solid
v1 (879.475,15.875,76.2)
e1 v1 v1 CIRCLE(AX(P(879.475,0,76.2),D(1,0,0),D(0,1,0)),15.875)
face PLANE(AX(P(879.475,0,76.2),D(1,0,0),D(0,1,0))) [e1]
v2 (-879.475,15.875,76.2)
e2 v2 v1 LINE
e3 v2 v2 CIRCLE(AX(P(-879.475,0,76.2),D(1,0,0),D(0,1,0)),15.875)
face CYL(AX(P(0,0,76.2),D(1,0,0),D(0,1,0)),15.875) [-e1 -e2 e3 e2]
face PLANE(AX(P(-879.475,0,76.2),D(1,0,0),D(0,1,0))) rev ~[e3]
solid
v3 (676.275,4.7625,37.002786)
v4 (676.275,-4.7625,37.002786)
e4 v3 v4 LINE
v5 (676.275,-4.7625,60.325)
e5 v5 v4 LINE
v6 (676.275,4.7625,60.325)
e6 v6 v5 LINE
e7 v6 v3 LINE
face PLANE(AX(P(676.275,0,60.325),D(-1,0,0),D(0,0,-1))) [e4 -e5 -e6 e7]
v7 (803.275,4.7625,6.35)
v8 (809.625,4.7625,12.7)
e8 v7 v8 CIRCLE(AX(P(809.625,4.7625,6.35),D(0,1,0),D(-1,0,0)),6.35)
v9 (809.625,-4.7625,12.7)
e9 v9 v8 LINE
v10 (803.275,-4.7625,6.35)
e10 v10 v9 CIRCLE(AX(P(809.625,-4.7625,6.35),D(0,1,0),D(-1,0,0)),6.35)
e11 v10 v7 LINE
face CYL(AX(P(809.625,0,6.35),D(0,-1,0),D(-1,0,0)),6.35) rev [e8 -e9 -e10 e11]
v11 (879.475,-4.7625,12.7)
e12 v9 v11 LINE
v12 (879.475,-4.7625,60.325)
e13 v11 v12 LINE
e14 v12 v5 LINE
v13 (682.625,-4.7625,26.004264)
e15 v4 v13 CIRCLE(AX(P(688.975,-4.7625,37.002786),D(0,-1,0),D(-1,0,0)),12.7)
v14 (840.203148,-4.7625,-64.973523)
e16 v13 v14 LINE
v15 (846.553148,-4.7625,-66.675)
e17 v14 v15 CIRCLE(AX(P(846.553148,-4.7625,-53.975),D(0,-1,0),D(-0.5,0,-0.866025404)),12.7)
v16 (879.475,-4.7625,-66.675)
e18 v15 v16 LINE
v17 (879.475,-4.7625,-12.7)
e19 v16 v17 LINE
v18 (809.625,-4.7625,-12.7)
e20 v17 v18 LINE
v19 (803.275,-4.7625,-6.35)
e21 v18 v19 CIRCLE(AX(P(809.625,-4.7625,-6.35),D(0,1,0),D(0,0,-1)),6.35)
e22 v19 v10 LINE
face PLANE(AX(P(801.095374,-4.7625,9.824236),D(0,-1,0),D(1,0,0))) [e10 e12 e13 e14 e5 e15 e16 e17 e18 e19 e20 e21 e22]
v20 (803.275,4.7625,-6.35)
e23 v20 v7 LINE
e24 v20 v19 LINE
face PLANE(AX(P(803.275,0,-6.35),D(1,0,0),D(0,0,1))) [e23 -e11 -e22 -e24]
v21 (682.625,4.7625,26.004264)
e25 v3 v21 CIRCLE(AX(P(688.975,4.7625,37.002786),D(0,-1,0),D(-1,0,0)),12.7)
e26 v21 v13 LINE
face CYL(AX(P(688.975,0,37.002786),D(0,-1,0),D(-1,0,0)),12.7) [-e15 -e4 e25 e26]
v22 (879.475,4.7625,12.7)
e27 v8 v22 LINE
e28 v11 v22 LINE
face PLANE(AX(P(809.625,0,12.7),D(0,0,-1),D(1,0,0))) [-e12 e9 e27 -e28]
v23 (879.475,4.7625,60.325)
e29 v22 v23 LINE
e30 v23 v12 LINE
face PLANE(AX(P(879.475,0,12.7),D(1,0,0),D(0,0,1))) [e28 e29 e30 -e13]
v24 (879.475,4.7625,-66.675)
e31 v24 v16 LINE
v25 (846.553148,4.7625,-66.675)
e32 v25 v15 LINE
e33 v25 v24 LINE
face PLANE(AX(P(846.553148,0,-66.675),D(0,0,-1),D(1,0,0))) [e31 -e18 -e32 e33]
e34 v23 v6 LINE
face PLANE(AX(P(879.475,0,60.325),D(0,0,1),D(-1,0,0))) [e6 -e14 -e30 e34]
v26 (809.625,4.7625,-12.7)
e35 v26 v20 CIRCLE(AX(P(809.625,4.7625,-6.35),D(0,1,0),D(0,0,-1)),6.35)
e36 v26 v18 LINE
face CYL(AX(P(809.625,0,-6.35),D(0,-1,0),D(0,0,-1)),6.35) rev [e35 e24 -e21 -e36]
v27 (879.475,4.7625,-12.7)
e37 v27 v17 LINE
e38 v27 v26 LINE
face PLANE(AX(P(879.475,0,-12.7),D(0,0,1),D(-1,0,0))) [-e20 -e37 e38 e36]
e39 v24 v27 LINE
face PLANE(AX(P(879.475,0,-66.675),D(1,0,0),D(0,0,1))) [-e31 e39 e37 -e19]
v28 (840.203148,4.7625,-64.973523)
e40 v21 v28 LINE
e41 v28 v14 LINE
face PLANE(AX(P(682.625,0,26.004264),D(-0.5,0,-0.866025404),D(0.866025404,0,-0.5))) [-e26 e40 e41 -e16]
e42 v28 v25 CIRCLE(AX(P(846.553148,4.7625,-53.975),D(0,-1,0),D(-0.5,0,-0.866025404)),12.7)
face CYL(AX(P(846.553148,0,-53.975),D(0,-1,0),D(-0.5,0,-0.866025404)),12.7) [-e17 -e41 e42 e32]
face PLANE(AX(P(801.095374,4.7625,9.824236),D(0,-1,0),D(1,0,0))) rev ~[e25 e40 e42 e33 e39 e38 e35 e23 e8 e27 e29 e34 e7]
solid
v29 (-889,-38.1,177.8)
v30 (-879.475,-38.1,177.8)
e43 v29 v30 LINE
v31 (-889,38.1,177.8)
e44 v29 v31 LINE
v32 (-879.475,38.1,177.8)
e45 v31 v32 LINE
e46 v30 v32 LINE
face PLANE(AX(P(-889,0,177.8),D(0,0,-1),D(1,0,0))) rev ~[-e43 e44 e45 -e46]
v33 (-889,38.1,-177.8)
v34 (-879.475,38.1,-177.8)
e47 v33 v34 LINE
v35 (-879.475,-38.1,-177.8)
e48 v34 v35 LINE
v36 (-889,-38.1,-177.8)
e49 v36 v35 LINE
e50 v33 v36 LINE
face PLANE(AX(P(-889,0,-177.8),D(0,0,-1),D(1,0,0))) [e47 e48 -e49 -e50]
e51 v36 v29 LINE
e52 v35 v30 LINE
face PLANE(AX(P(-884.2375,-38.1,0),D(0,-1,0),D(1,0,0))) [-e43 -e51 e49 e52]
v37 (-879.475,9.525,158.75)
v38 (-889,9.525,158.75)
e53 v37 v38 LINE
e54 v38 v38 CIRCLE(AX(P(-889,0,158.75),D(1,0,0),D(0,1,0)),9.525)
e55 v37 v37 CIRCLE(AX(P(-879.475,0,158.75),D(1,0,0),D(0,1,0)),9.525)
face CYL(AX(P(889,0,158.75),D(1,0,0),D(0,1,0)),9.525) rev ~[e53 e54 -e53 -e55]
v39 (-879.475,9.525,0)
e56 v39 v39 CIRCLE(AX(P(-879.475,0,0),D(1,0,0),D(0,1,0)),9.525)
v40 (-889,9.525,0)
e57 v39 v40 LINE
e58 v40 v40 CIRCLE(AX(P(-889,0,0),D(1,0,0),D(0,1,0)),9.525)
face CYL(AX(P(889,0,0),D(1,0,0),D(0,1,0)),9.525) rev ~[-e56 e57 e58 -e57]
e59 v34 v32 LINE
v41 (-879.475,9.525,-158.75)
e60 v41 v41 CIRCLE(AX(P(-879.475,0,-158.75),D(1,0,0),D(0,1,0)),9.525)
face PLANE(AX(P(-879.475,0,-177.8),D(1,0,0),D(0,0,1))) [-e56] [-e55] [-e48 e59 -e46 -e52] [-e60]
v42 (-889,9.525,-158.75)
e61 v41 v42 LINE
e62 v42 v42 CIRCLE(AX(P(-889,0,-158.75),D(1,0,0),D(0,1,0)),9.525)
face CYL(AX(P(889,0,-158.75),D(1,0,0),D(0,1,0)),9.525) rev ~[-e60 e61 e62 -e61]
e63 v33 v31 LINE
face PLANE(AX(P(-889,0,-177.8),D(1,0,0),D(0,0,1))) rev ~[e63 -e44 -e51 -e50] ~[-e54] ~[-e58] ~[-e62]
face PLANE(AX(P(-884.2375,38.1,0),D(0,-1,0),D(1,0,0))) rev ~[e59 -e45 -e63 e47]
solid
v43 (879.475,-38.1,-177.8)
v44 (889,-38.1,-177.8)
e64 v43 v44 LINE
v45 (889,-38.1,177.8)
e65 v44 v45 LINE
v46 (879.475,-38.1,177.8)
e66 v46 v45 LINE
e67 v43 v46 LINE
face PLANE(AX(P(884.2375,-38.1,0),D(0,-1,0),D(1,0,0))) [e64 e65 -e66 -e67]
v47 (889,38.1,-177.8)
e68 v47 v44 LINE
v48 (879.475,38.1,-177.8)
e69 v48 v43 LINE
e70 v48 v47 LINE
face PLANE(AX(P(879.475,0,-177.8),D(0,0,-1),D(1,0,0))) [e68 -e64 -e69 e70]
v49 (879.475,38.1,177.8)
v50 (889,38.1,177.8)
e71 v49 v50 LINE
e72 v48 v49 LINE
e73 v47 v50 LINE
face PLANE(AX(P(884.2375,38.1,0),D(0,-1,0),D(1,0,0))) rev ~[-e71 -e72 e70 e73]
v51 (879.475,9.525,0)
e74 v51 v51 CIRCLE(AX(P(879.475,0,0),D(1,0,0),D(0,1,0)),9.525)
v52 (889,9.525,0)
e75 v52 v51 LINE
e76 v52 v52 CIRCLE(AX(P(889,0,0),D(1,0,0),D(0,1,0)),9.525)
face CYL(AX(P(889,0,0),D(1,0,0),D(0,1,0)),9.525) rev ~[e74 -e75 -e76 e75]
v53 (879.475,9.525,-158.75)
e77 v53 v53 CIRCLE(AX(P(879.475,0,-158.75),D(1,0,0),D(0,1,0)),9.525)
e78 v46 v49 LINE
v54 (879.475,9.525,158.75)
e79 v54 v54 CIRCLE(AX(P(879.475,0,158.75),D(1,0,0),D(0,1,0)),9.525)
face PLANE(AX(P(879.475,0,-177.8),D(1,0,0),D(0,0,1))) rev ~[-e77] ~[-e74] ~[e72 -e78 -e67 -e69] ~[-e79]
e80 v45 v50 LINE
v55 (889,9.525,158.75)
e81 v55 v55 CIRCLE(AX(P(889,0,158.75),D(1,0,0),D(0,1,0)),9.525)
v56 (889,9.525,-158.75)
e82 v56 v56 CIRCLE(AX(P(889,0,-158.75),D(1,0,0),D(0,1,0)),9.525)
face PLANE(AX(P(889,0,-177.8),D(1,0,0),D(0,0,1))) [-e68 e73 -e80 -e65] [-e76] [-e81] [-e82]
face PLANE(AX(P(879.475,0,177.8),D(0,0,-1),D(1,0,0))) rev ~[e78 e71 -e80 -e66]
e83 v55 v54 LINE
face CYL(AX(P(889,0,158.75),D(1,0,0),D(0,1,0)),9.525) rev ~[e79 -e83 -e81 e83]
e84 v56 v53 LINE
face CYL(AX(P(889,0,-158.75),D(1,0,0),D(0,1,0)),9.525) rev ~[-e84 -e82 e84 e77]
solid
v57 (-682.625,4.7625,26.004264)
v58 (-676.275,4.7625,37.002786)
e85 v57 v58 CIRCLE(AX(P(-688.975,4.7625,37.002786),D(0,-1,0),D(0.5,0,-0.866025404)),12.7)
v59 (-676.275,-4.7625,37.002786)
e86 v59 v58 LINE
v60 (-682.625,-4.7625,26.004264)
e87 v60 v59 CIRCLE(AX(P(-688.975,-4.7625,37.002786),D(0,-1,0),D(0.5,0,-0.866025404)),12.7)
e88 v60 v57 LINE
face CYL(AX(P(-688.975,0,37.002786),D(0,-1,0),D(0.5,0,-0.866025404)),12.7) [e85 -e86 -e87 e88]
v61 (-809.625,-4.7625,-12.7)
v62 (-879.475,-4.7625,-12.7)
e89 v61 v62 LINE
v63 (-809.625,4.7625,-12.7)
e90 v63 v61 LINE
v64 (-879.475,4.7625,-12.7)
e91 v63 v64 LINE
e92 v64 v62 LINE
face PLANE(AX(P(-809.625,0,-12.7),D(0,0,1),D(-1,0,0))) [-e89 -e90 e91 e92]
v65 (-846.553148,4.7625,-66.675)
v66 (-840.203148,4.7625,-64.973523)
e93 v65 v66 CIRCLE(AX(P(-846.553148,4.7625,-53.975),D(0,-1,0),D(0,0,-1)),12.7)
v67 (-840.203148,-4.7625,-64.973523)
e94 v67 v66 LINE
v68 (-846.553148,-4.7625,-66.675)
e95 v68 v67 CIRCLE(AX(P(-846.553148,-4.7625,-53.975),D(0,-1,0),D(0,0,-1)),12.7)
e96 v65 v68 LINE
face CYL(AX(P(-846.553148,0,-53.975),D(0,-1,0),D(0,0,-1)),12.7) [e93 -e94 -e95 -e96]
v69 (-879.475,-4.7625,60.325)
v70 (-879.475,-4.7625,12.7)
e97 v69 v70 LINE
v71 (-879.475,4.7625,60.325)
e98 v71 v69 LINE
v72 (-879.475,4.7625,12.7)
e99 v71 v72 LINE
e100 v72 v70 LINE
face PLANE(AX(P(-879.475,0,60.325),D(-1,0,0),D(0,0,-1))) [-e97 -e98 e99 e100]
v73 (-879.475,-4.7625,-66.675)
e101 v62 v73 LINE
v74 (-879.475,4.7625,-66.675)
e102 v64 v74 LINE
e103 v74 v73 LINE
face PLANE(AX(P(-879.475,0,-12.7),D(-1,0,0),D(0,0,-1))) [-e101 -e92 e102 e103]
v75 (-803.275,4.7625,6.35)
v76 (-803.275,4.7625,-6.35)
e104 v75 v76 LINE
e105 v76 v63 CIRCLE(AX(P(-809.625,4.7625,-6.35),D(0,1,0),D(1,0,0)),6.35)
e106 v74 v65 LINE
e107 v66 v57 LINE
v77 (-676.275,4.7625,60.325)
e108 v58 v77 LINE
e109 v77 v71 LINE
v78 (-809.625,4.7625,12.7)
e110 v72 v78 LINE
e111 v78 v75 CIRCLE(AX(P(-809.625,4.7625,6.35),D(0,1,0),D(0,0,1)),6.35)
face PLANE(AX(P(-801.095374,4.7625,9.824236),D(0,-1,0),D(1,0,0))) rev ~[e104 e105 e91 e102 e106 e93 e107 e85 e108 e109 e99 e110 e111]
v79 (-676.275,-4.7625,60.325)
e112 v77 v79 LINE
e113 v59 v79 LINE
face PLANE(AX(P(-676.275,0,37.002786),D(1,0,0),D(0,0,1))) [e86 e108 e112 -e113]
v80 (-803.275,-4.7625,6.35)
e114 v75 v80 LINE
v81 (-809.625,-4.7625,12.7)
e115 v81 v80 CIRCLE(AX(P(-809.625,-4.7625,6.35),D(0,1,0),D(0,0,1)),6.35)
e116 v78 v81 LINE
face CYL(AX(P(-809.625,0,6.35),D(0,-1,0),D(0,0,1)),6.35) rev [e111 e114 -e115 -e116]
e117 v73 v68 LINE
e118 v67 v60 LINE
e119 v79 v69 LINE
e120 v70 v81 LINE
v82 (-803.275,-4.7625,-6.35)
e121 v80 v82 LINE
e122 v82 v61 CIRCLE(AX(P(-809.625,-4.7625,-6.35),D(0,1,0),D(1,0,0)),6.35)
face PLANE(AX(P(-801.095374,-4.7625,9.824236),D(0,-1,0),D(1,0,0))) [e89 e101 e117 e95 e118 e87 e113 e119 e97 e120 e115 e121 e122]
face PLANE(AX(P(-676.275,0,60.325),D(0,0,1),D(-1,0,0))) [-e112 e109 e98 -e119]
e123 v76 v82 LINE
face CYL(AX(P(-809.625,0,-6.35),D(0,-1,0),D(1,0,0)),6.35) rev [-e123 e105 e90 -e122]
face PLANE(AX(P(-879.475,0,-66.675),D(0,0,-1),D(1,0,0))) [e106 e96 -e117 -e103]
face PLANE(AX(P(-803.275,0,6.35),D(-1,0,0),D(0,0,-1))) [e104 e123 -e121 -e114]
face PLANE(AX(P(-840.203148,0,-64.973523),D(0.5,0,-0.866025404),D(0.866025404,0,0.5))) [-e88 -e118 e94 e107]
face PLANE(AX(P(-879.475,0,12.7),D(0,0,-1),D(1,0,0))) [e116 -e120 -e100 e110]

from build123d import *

# Parameters (mm, degrees)
F0_W          = 9.525
F0_H          = 355.6
F1_DEPTH      = 38.1
F1_DEPTH_BACK = 38.1
F2_R          = 15.875
F3_DEPTH      = 879.475
F3_DEPTH_BACK = 879.475
F4_R          = 9.525
F5_DEPTH      = 1778.001
F7_DEPTH      = 4.7625
F7_DEPTH_BACK = 4.7625


# Not quite as in the source:
# - a length typed as a fraction of an inch, garbled in the dataset ("3 / 203.2 mm" for 3/8 in), is restored


with BuildPart() as f1:
    # F0 (on Front) → F1 (new body, two sides)
    with BuildSketch(Plane.XZ) as f1_sk:
        with Locations((-884.2375, 0)):
            Rectangle(F0_W, F0_H)
    extrude(amount=F1_DEPTH)
    extrude(f1_sk.sketch, amount=-F1_DEPTH_BACK)


with BuildPart() as f1b:
    # F0 (on Front) → F1, piece 2 (new body, two sides)
    with BuildSketch(Plane.XZ) as f1_2_sk:
        with Locations((884.2375, 0)):
            Rectangle(F0_W, F0_H)
    extrude(amount=F1_DEPTH)
    extrude(f1_2_sk.sketch, amount=-F1_DEPTH_BACK)


with BuildPart() as f3:
    # F2 (on Right) → F3 (new body, two sides)
    with BuildSketch(Plane.YZ) as f3_sk:
        with Locations((0, 76.2)):
            Circle(F2_R)
    extrude(amount=F3_DEPTH)
    extrude(f3_sk.sketch, amount=-F3_DEPTH_BACK)


with BuildPart() as f5_tool:
    # F4 (on face) → F5 (new body, through all)
    with BuildSketch(Plane.YZ.offset(889)):
        with Locations((0, -158.75)):
            Circle(F4_R)
        Circle(F4_R)
        with Locations((0, 158.75)):
            Circle(F4_R)
    extrude(amount=-F5_DEPTH)


with BuildPart() as f1_1:
    add(f1.part)

    # F5: cut by f5_tool
    add(f5_tool.part, mode=Mode.SUBTRACT)


with BuildPart() as f1b_1:
    add(f1b.part)

    # F5: cut by f5_tool
    add(f5_tool.part, mode=Mode.SUBTRACT)


with BuildPart() as f7:
    # F6 (on Front) → F7 (new body, two sides)
    with BuildSketch(Plane.XZ) as f7_sk:
        with BuildLine():
            Line((879.475, 12.7), (879.475, 60.325))
            Line((879.4750000002, 60.325), (676.275, 60.325))
            Line((676.275, 60.325), (676.275, 37.0027863833))
            ThreePointArc((676.275, 37.0027863833), (677.9764773719, 30.6527863833), (682.625, 26.0042637552))
            Line((682.625, 26.0042637552), (840.203148376, -64.9735226281))
            ThreePointArc((840.203148376, -64.9735226281), (843.2661465032, -66.2422579939), (846.553148376, -66.675))
            Line((846.553148376, -66.675), (879.475, -66.675))
            Line((879.475, -66.675), (879.475, -12.7))
            Line((879.475, -12.7), (809.625, -12.7))
            ThreePointArc((809.625, -12.7), (805.1348719395, -10.8401280605), (803.275, -6.35))
            Line((803.275, -6.35), (803.275, 6.35))
            ThreePointArc((803.275, 6.35), (805.1348719395, 10.8401280605), (809.625, 12.7))
            Line((809.625, 12.7), (879.475, 12.7))
        make_face()
    extrude(amount=F7_DEPTH)
    extrude(f7_sk.sketch, amount=-F7_DEPTH_BACK)


with BuildPart() as f7b:
    # F6 (on Front) → F7, piece 2 (new body, two sides)
    with BuildSketch(Plane.XZ) as f7_2_sk:
        with BuildLine():
            Line((-676.275, 37.0027863833), (-676.275, 60.325))
            Line((-676.275, 60.325), (-879.4749999994, 60.325))
            Line((-879.475, 60.325), (-879.475, 12.7))
            Line((-879.475, 12.7), (-809.625, 12.7))
            ThreePointArc((-809.625, 12.7), (-805.1348719395, 10.8401280605), (-803.275, 6.35))
            Line((-803.275, 6.35), (-803.275, -6.35))
            ThreePointArc((-803.275, -6.35), (-805.1348719395, -10.8401280605), (-809.625, -12.7))
            Line((-809.625, -12.7), (-879.475, -12.7))
            Line((-879.475, -12.7), (-879.475, -66.675))
            Line((-879.475, -66.675), (-846.553148376, -66.675))
            ThreePointArc((-846.553148376, -66.675), (-843.2661465032, -66.2422579939), (-840.203148376, -64.9735226281))
            Line((-840.203148376, -64.9735226281), (-682.625, 26.0042637552))
            ThreePointArc((-682.625, 26.0042637552), (-677.9764773719, 30.6527863833), (-676.275, 37.0027863833))
        make_face()
    extrude(amount=F7_DEPTH)
    extrude(f7_2_sk.sketch, amount=-F7_DEPTH_BACK)


solid = Compound([f3.part, f1_1.part, f1b_1.part, f7.part, f7b.part])
